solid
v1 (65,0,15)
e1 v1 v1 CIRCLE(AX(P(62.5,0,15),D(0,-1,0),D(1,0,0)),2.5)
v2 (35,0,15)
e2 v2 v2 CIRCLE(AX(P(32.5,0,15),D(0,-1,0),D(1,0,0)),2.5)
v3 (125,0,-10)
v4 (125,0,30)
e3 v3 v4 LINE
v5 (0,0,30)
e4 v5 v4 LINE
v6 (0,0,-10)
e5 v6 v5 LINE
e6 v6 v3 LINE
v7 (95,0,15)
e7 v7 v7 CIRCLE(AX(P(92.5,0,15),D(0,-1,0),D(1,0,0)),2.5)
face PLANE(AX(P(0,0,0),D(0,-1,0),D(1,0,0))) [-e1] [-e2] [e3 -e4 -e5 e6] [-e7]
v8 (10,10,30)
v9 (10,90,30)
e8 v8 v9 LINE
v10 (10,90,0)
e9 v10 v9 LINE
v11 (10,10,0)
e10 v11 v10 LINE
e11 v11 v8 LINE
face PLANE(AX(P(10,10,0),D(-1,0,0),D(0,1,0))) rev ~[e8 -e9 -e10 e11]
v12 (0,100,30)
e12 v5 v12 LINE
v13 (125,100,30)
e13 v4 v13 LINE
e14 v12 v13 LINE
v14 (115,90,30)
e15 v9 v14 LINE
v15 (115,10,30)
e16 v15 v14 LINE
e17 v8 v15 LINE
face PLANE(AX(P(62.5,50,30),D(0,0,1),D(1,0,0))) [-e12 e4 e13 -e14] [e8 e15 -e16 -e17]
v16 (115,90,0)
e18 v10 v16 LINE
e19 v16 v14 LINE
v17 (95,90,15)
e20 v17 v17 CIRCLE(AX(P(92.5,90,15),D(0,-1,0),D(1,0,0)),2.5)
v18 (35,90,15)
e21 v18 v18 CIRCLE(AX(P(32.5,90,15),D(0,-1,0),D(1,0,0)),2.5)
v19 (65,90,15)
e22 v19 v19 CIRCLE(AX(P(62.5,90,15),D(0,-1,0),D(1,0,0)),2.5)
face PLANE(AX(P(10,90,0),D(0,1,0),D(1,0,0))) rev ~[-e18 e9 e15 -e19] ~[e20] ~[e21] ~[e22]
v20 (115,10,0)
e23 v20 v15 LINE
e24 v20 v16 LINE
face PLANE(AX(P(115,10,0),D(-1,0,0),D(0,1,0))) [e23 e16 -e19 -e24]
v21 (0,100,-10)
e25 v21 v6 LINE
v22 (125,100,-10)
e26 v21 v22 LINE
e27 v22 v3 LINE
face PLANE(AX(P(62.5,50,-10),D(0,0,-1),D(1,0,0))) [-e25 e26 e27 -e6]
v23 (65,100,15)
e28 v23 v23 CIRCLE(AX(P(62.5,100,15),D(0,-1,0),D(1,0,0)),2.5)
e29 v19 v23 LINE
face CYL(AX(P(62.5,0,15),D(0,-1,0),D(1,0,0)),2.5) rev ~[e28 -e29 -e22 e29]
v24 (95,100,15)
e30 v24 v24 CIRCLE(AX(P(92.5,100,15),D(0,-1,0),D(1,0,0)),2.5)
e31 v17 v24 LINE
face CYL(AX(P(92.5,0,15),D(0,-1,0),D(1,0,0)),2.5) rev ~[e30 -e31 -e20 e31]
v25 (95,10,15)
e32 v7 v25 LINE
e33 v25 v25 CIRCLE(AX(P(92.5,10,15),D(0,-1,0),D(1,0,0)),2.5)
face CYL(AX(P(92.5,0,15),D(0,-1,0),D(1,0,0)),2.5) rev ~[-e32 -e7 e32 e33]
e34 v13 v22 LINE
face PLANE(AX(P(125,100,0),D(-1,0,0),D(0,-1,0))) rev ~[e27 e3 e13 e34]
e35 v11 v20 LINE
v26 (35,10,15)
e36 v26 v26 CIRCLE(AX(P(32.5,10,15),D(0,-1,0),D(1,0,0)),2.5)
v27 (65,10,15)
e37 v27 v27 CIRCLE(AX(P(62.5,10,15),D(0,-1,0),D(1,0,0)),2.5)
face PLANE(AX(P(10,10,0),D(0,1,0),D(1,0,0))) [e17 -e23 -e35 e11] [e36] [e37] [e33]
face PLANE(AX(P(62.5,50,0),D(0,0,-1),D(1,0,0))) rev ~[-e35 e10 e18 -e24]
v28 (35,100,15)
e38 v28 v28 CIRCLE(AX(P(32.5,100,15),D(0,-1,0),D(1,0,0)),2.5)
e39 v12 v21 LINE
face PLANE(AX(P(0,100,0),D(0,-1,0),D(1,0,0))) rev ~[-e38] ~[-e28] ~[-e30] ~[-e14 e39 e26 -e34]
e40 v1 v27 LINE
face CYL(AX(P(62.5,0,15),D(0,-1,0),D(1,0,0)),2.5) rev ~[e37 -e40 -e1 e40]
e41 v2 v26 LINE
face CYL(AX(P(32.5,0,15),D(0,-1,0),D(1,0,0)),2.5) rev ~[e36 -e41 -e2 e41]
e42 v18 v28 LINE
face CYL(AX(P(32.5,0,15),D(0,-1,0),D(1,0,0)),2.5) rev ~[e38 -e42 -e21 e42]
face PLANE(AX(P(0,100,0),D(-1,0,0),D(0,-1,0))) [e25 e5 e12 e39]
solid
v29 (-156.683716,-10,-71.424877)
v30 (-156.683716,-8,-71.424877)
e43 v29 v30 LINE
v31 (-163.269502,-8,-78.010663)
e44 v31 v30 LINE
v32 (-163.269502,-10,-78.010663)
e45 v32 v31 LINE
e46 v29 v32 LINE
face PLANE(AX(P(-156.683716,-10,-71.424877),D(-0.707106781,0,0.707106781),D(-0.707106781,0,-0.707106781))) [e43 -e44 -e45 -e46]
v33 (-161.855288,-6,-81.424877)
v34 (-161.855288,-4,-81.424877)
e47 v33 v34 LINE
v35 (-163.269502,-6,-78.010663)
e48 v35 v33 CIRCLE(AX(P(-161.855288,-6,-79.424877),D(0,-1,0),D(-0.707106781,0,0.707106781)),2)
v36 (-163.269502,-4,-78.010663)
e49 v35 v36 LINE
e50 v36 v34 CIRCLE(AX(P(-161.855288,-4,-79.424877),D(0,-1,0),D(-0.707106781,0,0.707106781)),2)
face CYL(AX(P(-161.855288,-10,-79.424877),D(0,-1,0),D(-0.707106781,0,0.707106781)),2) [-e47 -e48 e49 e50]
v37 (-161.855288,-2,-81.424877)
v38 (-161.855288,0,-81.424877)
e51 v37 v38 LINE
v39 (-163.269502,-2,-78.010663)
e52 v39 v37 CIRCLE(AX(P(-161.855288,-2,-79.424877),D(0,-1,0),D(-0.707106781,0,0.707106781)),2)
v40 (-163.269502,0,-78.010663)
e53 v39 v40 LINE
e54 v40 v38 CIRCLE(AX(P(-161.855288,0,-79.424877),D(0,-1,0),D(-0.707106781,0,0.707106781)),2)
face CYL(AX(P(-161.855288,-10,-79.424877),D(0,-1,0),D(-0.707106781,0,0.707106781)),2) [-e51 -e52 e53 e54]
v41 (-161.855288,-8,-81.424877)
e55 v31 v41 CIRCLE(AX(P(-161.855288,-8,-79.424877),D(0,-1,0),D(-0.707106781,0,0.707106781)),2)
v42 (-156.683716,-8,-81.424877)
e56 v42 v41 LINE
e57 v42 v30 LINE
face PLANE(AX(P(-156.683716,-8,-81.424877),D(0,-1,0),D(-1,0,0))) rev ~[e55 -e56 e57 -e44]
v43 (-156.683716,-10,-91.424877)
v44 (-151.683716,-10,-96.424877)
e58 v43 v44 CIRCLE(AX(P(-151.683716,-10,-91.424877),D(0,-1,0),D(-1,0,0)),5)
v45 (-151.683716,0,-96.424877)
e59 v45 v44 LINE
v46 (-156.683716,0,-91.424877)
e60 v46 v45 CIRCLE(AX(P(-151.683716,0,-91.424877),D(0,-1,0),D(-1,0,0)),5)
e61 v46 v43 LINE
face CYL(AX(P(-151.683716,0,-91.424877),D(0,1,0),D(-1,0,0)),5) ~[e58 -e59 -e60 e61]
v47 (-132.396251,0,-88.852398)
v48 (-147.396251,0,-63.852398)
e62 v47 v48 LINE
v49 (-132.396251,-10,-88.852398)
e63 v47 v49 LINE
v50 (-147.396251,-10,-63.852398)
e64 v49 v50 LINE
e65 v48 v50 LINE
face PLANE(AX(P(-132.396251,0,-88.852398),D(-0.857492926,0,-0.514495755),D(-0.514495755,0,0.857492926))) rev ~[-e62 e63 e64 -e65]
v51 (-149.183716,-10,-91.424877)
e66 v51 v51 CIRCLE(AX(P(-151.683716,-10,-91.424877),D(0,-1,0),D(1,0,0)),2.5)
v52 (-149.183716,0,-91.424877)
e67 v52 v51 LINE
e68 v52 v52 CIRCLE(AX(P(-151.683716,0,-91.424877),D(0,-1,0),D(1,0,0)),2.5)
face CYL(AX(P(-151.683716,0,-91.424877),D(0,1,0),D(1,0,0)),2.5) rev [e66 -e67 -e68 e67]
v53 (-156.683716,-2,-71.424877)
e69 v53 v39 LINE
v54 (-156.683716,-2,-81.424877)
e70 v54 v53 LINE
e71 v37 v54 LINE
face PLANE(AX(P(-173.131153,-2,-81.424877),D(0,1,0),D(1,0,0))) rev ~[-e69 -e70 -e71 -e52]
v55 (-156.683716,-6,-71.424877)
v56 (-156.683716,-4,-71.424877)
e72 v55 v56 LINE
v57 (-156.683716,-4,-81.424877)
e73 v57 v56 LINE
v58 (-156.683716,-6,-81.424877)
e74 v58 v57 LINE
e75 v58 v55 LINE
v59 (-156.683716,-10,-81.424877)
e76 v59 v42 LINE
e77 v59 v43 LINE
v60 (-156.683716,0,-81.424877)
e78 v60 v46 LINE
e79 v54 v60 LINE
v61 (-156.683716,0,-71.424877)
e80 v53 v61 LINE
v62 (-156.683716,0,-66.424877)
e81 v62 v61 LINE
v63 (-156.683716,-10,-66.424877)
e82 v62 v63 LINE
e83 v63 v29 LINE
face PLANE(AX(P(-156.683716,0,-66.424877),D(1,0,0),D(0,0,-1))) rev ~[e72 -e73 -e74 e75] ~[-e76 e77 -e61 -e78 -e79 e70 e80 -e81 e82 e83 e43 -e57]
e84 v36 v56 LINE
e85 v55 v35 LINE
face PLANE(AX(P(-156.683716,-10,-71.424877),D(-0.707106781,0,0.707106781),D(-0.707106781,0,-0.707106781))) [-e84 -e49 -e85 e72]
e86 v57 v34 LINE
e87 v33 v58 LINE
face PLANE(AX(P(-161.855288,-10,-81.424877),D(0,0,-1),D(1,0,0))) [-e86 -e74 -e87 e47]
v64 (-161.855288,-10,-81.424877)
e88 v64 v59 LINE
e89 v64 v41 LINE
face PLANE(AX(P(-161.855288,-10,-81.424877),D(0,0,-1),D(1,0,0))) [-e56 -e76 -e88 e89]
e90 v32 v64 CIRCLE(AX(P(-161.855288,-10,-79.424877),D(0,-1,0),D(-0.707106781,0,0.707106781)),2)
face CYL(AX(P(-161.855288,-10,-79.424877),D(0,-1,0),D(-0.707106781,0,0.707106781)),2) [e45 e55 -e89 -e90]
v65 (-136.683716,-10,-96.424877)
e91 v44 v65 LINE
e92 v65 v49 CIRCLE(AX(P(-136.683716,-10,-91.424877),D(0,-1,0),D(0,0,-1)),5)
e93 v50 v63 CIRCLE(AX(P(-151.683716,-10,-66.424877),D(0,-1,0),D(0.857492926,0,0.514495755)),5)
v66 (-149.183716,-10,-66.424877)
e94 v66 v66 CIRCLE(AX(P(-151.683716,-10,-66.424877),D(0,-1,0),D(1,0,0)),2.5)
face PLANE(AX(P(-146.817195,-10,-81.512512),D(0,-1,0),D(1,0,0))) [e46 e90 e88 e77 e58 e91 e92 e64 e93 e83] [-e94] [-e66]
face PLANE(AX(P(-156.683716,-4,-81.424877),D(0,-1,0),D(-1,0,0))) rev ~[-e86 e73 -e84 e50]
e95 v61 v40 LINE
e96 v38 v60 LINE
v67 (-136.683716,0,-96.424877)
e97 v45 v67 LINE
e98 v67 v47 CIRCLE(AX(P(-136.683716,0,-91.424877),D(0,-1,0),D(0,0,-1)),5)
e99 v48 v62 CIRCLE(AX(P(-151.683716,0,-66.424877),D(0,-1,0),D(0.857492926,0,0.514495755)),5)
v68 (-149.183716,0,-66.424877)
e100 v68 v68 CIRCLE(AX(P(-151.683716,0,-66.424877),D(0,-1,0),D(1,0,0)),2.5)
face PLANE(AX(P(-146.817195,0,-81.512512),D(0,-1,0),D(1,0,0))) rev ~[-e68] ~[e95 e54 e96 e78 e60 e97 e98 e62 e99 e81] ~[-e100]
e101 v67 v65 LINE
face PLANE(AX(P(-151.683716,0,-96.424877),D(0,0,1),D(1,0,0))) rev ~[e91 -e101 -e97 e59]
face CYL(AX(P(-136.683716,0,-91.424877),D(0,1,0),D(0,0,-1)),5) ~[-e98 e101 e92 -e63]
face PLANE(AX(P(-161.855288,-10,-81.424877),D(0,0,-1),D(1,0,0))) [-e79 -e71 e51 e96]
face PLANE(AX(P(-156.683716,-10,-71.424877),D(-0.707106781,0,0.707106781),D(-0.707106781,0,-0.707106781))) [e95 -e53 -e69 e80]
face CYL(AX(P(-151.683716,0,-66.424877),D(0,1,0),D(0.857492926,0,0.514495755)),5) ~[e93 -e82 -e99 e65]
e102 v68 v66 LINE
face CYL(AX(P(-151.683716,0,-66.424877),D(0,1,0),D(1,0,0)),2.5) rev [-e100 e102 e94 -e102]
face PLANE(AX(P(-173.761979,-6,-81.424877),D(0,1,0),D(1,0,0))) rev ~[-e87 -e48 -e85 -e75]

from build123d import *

# Parameters (mm, degrees)
F0_W      = 125
F0_H      = 100
F0_W_2    = 105
F0_H_2    = 80
F1_DEPTH  = 30
F2_R      = 2.5
F3_DEPTH  = 100.001
F4_W      = 125
F4_H      = 100
F4_W_2    = 105
F4_H_2    = 80
F5_DEPTH  = 10
F7_R      = 2.5
F8_DEPTH  = 10
F10_DEPTH = 10
F11_W     = 11.9066902784
F11_H     = 2
F11_W_2   = 5.1715728753
F11_W_3   = 11.2758645205
F12_DEPTH = 25


with BuildPart() as f1:
    # F0 (on Top) → F1 (new body)
    with BuildSketch(Plane.XY):
        with Locations((62.5, 50)):
            Rectangle(F0_W, F0_H)
        with Locations((62.5, 50)):
            Rectangle(F0_W_2, F0_H_2, mode=Mode.SUBTRACT)
    extrude(amount=F1_DEPTH)

    # F2 (on face) → F3 (cut, through all)
    with BuildSketch(Plane.XZ):
        with Locations((32.5, 15)):
            Circle(F2_R)
        with Locations((62.5, 15)):
            Circle(F2_R)
        with Locations((92.5, 15)):
            Circle(F2_R)
    extrude(amount=-F3_DEPTH, mode=Mode.SUBTRACT)

    # F4 (on face) → F5 (join)
    with BuildSketch(Plane(origin=(0, 0, 0), x_dir=(1, 0, 0), z_dir=(0, 0, -1))):
        with Locations((62.5, -50)):
            Rectangle(F4_W, F4_H)
        with Locations((62.5, -50)):
            Rectangle(F4_W_2, F4_H_2, mode=Mode.SUBTRACT)
        with Locations((62.5, -50)):
            Rectangle(F4_W_2, F4_H_2)
    extrude(amount=F5_DEPTH)


with BuildPart() as f8:
    # F7 (on Front) → F8 (new body)
    with BuildSketch(Plane.XZ):
        with BuildLine():
            ThreePointArc((-147.3962509632, -63.8523980975), (-153.0183835013, -61.6063022336), (-156.6837155918, -66.4248768747))
            Line((-156.6837155918, -66.4248768747), (-156.6837155918, -91.4248768747))
            ThreePointArc((-156.6837155918, -91.4248768747), (-155.2192494977, -94.9604107806), (-151.6837155918, -96.4248768747))
            Line((-151.6837155918, -96.4248768747), (-136.6837155918, -96.4248768747))
            ThreePointArc((-136.6837155918, -96.4248768747), (-132.332716058, -93.8883709496), (-132.3962509632, -88.8523980975))
            Line((-132.3962509632, -88.8523980975), (-147.3962509632, -63.8523980975))
        make_face()
        with Locations((-151.6837155918, -91.4248768747)):
            Circle(F7_R, mode=Mode.SUBTRACT)
        with Locations((-151.6837155918, -66.4248768747)):
            Circle(F7_R, mode=Mode.SUBTRACT)
    extrude(amount=F8_DEPTH)

    # F9 (on face) → F10 (join)
    with BuildSketch(Plane.XZ.offset(10)):
        with BuildLine():
            Line((-156.6837155918, -81.4248768747), (-156.6837155918, -71.4248768747))
            Line((-156.6837155918, -71.4248768747), (-163.2695020294, -78.0106633123))
            ThreePointArc((-163.2695020294, -78.0106633123), (-163.7030475321, -80.1902437394), (-161.855288467, -81.4248768747))
            Line((-161.855288467, -81.4248768747), (-156.6837155918, -81.4248768747))
        make_face()
    extrude(amount=-F10_DEPTH)

    # F11 (on face) → F12 (cut)
    with BuildSketch(Plane(origin=(0, 0, -81.4248768747), x_dir=(1, 0, 0), z_dir=(0, 0, -1))):
        with Locations((-167.8086336062, 7)):
            Rectangle(F11_W, F11_H)
        with Locations((-159.2695020294, 3)):
            Rectangle(F11_W_2, F11_H)
        with Locations((-159.2695020294, 7)):
            Rectangle(F11_W_2, F11_H)
        with Locations((-167.4932207273, 3)):
            Rectangle(F11_W_3, F11_H)
    extrude(amount=-F12_DEPTH, mode=Mode.SUBTRACT)


solid = Compound([f1.part, f8.part])
